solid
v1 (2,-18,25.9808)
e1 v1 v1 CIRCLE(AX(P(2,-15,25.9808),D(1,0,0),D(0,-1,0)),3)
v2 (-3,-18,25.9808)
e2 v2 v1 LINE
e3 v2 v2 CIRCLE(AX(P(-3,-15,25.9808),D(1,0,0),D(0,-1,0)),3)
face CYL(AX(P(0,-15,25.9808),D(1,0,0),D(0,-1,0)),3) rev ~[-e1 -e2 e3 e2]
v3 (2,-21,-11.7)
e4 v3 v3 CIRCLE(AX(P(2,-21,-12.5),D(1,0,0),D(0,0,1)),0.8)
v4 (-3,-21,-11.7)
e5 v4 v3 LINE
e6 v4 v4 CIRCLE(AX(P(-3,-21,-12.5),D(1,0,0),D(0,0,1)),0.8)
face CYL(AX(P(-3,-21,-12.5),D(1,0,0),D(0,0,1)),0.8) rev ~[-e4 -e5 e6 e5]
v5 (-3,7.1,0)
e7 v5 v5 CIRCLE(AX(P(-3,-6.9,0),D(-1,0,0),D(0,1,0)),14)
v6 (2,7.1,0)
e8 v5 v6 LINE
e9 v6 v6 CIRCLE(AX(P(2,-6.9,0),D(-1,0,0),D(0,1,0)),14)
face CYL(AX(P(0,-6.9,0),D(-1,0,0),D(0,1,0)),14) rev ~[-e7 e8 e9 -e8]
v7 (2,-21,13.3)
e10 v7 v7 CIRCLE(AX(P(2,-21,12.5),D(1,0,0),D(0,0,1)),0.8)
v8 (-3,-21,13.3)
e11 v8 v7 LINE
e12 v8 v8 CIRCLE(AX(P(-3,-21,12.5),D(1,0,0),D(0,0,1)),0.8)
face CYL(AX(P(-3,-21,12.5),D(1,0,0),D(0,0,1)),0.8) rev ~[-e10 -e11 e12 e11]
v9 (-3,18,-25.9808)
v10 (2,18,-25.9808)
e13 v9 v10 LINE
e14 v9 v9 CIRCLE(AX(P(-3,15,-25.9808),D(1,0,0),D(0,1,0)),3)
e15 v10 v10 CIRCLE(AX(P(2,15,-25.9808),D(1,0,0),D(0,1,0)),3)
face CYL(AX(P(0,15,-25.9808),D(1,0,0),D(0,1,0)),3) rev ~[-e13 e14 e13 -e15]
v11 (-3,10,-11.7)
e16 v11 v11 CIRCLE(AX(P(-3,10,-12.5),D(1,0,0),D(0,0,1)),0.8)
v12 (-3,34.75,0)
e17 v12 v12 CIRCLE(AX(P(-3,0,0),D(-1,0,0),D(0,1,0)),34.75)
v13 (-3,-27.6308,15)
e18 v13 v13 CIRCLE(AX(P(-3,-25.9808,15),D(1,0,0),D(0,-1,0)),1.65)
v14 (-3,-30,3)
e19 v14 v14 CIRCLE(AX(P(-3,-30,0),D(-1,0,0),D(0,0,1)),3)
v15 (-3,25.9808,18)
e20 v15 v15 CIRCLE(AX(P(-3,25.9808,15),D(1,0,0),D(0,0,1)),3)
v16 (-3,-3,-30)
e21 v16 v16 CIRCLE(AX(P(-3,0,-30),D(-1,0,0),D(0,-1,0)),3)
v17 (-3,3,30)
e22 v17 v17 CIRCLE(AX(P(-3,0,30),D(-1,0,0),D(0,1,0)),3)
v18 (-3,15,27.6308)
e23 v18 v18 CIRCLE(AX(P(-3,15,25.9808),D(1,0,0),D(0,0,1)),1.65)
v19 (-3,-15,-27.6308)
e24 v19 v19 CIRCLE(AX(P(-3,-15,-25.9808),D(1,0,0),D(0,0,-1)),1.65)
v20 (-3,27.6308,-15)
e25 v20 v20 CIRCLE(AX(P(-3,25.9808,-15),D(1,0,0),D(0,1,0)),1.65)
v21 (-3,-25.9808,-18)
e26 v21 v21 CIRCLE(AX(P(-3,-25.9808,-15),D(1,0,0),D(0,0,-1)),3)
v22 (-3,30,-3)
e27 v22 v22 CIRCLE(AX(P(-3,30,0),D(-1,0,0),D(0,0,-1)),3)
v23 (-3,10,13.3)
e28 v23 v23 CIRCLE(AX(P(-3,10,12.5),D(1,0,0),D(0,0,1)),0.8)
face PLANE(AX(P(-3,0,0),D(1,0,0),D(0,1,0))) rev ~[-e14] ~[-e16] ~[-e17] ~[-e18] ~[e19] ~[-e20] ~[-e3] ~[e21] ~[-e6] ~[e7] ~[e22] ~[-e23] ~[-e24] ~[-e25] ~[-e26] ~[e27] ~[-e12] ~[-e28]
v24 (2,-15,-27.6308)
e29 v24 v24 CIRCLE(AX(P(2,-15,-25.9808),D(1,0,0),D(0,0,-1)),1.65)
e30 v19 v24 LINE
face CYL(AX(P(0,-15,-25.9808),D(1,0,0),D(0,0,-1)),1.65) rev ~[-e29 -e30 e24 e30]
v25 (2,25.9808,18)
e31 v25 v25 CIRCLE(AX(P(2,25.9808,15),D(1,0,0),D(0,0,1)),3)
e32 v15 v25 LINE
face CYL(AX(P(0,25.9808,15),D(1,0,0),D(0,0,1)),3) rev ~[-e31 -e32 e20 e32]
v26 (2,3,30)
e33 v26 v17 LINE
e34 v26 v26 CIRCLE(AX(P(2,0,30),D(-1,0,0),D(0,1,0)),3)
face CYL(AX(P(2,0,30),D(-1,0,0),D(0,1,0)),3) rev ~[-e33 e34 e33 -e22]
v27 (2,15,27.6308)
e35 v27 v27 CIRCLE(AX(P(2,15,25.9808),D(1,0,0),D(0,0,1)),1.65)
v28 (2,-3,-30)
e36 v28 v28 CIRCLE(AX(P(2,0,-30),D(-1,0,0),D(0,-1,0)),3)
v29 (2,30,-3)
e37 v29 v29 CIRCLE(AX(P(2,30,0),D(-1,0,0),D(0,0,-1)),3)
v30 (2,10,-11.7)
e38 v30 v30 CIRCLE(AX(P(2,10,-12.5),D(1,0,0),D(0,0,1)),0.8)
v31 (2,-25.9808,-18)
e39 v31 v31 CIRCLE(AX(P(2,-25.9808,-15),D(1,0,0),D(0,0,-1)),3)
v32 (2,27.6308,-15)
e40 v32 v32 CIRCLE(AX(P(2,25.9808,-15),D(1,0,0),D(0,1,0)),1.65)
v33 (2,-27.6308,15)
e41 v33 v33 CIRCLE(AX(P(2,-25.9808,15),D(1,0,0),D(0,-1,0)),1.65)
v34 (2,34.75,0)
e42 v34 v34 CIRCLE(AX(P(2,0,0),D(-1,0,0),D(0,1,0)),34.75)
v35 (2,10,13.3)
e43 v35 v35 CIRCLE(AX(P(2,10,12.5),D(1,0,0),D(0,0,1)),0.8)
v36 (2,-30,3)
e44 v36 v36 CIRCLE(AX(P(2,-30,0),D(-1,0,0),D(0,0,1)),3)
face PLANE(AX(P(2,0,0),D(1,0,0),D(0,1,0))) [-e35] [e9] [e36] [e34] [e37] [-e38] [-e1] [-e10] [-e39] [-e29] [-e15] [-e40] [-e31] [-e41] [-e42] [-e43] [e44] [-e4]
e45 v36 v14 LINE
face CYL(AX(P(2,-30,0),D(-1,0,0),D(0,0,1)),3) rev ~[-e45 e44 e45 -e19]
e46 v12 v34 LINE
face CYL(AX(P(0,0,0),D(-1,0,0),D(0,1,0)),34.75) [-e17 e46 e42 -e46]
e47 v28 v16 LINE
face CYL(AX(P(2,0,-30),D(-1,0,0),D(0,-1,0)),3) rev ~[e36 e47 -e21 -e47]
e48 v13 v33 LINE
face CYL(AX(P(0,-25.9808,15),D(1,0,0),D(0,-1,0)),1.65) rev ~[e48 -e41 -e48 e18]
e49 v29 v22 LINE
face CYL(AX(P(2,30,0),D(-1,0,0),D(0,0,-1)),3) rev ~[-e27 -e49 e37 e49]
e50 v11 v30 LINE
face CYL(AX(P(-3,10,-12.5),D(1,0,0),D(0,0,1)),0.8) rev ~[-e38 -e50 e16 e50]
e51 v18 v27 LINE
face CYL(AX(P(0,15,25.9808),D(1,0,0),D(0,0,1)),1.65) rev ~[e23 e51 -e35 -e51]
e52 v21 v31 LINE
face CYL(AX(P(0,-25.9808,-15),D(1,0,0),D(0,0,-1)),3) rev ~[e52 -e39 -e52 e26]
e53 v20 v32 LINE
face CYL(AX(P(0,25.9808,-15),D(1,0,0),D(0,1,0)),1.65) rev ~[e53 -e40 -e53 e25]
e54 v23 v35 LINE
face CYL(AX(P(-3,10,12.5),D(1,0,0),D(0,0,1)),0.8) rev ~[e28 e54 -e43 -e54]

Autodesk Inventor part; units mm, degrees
ref_plane "YZ Plane" through (0, 0, 0) normal (1, 0, 0) x (0, 1, 0)
ref_plane "XZ Plane" through (0, 0, 0) normal (0, 1, 0) x (-1, 0, 0)
ref_plane "XY Plane" through (0, 0, 0) normal (0, 0, 1) x (1, 0, 0)
sketch "Sketch1" plane through (0, 0, 0) normal (1, 0, 0) x (0, 1, 0)
  circle A0 centre (0, 0) radius 34.75
  circle A1 centre (-6.9, 0) radius 14
  dimension "d0" = 69.5
  dimension "d1" = 28
  dimension "d2" = 6.9
extrude "Extrusion1" add sketch "Sketch1" along normal blind 2
sketch "Sketch2" plane through (0, 0, 0) normal (-1, 0, 0) x (0, 0, 1)
  circle A0 centre (0, 0) radius 30
  line L0 (0, 0) -> (25.9808, 15)
  line L1 (0, 0) -> (30, 0) construction
  dimension "d5" = 60
  dimension "d6" = 30
hole "Hole1" at (0, 15, 25.9808) direction (1, 0, 0) diameter 3.3 depth 5
pattern_circular "Circular Pattern1" count 4 over 360 about axis through (0, 0, 0) along (1, 0, 0) of "Hole1"
thread "Thread1" size "M4x0.7" class "6H" standard "ANSI Metric M Profile" full length
thread "Thread2" size "M4x0.7" class "6H" standard "ANSI Metric M Profile" full length
thread "Thread3" size "M4x0.7" class "6H" standard "ANSI Metric M Profile" full length
thread "Thread4" size "M4x0.7" class "6H" standard "ANSI Metric M Profile" full length
sketch "Sketch3" plane through (2, 0, 0) normal (1, 0, 0) x (0, 0, -1)
  circle A0 centre (0, 0) radius 30
  point P0 (0, 30)
  dimension "d25" = 60
hole "Hole2" at (2, 30, 0) direction (-1, 0, 0) diameter 6 depth 5
pattern_circular "Circular Pattern2" count 4 over 360 about axis through (0, 0, 0) along (1, 0, 0) of "Hole2"
sketch "Sketch4" plane through (0, 0, 0) normal (-1, 0, 0) x (0, 0, 1)
  circle A0 centre (0, 0) radius 30
  line L0 (0, 0) -> (15, 25.9808)
  line L1 (0, 0) -> (30, 0) construction
  point P0 (15, 25.9808)
  dimension "d36" = 60
  dimension "d37" = 60
hole "Hole3" at (0, 25.9808, 15) direction (1, 0, 0) diameter 6 depth 5
pattern_circular "Circular Pattern3" count 4 over 360 about axis through (0, 0, 0) along (1, 0, 0) of "Hole3"
thicken "Thicken1" operation add thickness 3 both sides no extend neighbours yes toward (-1, 0, 0) faces at (0, 19.5446, -6.1067)
sketch "Sketch5" plane through (-3, 0, 0) normal (-1, 0, 0) x (0, 0, 1)
  line L0 (-12.5, 10) -> (12.5, 10)
  line L1 (12.5, 10) -> (12.5, -21)
  line L2 (12.5, -21) -> (-12.5, -21)
  line L3 (-12.5, -21) -> (-12.5, 10)
  point P0 (0, 0)
  point P1 (0, 10)
  dimension "d50" = 25
  dimension "d51" = 10
  dimension "d52" = 31
hole "Hole4" at (-3, 10, -12.5) at (-3, 10, 12.5) at (-3, -21, 12.5) at (-3, -21, -12.5) direction (1, 0, 0) diameter 1.6 depth 5
thread "Thread5" size "M2x0.4" class "6H" standard "ANSI Metric M Profile" full length
thread "Thread6" size "M2x0.4" class "6H" standard "ANSI Metric M Profile" full length
thread "Thread7" size "M2x0.4" class "6H" standard "ANSI Metric M Profile" full length
thread "Thread8" size "M2x0.4" class "6H" standard "ANSI Metric M Profile" full length
properties part number "sample-transfer_adapter-plate"
